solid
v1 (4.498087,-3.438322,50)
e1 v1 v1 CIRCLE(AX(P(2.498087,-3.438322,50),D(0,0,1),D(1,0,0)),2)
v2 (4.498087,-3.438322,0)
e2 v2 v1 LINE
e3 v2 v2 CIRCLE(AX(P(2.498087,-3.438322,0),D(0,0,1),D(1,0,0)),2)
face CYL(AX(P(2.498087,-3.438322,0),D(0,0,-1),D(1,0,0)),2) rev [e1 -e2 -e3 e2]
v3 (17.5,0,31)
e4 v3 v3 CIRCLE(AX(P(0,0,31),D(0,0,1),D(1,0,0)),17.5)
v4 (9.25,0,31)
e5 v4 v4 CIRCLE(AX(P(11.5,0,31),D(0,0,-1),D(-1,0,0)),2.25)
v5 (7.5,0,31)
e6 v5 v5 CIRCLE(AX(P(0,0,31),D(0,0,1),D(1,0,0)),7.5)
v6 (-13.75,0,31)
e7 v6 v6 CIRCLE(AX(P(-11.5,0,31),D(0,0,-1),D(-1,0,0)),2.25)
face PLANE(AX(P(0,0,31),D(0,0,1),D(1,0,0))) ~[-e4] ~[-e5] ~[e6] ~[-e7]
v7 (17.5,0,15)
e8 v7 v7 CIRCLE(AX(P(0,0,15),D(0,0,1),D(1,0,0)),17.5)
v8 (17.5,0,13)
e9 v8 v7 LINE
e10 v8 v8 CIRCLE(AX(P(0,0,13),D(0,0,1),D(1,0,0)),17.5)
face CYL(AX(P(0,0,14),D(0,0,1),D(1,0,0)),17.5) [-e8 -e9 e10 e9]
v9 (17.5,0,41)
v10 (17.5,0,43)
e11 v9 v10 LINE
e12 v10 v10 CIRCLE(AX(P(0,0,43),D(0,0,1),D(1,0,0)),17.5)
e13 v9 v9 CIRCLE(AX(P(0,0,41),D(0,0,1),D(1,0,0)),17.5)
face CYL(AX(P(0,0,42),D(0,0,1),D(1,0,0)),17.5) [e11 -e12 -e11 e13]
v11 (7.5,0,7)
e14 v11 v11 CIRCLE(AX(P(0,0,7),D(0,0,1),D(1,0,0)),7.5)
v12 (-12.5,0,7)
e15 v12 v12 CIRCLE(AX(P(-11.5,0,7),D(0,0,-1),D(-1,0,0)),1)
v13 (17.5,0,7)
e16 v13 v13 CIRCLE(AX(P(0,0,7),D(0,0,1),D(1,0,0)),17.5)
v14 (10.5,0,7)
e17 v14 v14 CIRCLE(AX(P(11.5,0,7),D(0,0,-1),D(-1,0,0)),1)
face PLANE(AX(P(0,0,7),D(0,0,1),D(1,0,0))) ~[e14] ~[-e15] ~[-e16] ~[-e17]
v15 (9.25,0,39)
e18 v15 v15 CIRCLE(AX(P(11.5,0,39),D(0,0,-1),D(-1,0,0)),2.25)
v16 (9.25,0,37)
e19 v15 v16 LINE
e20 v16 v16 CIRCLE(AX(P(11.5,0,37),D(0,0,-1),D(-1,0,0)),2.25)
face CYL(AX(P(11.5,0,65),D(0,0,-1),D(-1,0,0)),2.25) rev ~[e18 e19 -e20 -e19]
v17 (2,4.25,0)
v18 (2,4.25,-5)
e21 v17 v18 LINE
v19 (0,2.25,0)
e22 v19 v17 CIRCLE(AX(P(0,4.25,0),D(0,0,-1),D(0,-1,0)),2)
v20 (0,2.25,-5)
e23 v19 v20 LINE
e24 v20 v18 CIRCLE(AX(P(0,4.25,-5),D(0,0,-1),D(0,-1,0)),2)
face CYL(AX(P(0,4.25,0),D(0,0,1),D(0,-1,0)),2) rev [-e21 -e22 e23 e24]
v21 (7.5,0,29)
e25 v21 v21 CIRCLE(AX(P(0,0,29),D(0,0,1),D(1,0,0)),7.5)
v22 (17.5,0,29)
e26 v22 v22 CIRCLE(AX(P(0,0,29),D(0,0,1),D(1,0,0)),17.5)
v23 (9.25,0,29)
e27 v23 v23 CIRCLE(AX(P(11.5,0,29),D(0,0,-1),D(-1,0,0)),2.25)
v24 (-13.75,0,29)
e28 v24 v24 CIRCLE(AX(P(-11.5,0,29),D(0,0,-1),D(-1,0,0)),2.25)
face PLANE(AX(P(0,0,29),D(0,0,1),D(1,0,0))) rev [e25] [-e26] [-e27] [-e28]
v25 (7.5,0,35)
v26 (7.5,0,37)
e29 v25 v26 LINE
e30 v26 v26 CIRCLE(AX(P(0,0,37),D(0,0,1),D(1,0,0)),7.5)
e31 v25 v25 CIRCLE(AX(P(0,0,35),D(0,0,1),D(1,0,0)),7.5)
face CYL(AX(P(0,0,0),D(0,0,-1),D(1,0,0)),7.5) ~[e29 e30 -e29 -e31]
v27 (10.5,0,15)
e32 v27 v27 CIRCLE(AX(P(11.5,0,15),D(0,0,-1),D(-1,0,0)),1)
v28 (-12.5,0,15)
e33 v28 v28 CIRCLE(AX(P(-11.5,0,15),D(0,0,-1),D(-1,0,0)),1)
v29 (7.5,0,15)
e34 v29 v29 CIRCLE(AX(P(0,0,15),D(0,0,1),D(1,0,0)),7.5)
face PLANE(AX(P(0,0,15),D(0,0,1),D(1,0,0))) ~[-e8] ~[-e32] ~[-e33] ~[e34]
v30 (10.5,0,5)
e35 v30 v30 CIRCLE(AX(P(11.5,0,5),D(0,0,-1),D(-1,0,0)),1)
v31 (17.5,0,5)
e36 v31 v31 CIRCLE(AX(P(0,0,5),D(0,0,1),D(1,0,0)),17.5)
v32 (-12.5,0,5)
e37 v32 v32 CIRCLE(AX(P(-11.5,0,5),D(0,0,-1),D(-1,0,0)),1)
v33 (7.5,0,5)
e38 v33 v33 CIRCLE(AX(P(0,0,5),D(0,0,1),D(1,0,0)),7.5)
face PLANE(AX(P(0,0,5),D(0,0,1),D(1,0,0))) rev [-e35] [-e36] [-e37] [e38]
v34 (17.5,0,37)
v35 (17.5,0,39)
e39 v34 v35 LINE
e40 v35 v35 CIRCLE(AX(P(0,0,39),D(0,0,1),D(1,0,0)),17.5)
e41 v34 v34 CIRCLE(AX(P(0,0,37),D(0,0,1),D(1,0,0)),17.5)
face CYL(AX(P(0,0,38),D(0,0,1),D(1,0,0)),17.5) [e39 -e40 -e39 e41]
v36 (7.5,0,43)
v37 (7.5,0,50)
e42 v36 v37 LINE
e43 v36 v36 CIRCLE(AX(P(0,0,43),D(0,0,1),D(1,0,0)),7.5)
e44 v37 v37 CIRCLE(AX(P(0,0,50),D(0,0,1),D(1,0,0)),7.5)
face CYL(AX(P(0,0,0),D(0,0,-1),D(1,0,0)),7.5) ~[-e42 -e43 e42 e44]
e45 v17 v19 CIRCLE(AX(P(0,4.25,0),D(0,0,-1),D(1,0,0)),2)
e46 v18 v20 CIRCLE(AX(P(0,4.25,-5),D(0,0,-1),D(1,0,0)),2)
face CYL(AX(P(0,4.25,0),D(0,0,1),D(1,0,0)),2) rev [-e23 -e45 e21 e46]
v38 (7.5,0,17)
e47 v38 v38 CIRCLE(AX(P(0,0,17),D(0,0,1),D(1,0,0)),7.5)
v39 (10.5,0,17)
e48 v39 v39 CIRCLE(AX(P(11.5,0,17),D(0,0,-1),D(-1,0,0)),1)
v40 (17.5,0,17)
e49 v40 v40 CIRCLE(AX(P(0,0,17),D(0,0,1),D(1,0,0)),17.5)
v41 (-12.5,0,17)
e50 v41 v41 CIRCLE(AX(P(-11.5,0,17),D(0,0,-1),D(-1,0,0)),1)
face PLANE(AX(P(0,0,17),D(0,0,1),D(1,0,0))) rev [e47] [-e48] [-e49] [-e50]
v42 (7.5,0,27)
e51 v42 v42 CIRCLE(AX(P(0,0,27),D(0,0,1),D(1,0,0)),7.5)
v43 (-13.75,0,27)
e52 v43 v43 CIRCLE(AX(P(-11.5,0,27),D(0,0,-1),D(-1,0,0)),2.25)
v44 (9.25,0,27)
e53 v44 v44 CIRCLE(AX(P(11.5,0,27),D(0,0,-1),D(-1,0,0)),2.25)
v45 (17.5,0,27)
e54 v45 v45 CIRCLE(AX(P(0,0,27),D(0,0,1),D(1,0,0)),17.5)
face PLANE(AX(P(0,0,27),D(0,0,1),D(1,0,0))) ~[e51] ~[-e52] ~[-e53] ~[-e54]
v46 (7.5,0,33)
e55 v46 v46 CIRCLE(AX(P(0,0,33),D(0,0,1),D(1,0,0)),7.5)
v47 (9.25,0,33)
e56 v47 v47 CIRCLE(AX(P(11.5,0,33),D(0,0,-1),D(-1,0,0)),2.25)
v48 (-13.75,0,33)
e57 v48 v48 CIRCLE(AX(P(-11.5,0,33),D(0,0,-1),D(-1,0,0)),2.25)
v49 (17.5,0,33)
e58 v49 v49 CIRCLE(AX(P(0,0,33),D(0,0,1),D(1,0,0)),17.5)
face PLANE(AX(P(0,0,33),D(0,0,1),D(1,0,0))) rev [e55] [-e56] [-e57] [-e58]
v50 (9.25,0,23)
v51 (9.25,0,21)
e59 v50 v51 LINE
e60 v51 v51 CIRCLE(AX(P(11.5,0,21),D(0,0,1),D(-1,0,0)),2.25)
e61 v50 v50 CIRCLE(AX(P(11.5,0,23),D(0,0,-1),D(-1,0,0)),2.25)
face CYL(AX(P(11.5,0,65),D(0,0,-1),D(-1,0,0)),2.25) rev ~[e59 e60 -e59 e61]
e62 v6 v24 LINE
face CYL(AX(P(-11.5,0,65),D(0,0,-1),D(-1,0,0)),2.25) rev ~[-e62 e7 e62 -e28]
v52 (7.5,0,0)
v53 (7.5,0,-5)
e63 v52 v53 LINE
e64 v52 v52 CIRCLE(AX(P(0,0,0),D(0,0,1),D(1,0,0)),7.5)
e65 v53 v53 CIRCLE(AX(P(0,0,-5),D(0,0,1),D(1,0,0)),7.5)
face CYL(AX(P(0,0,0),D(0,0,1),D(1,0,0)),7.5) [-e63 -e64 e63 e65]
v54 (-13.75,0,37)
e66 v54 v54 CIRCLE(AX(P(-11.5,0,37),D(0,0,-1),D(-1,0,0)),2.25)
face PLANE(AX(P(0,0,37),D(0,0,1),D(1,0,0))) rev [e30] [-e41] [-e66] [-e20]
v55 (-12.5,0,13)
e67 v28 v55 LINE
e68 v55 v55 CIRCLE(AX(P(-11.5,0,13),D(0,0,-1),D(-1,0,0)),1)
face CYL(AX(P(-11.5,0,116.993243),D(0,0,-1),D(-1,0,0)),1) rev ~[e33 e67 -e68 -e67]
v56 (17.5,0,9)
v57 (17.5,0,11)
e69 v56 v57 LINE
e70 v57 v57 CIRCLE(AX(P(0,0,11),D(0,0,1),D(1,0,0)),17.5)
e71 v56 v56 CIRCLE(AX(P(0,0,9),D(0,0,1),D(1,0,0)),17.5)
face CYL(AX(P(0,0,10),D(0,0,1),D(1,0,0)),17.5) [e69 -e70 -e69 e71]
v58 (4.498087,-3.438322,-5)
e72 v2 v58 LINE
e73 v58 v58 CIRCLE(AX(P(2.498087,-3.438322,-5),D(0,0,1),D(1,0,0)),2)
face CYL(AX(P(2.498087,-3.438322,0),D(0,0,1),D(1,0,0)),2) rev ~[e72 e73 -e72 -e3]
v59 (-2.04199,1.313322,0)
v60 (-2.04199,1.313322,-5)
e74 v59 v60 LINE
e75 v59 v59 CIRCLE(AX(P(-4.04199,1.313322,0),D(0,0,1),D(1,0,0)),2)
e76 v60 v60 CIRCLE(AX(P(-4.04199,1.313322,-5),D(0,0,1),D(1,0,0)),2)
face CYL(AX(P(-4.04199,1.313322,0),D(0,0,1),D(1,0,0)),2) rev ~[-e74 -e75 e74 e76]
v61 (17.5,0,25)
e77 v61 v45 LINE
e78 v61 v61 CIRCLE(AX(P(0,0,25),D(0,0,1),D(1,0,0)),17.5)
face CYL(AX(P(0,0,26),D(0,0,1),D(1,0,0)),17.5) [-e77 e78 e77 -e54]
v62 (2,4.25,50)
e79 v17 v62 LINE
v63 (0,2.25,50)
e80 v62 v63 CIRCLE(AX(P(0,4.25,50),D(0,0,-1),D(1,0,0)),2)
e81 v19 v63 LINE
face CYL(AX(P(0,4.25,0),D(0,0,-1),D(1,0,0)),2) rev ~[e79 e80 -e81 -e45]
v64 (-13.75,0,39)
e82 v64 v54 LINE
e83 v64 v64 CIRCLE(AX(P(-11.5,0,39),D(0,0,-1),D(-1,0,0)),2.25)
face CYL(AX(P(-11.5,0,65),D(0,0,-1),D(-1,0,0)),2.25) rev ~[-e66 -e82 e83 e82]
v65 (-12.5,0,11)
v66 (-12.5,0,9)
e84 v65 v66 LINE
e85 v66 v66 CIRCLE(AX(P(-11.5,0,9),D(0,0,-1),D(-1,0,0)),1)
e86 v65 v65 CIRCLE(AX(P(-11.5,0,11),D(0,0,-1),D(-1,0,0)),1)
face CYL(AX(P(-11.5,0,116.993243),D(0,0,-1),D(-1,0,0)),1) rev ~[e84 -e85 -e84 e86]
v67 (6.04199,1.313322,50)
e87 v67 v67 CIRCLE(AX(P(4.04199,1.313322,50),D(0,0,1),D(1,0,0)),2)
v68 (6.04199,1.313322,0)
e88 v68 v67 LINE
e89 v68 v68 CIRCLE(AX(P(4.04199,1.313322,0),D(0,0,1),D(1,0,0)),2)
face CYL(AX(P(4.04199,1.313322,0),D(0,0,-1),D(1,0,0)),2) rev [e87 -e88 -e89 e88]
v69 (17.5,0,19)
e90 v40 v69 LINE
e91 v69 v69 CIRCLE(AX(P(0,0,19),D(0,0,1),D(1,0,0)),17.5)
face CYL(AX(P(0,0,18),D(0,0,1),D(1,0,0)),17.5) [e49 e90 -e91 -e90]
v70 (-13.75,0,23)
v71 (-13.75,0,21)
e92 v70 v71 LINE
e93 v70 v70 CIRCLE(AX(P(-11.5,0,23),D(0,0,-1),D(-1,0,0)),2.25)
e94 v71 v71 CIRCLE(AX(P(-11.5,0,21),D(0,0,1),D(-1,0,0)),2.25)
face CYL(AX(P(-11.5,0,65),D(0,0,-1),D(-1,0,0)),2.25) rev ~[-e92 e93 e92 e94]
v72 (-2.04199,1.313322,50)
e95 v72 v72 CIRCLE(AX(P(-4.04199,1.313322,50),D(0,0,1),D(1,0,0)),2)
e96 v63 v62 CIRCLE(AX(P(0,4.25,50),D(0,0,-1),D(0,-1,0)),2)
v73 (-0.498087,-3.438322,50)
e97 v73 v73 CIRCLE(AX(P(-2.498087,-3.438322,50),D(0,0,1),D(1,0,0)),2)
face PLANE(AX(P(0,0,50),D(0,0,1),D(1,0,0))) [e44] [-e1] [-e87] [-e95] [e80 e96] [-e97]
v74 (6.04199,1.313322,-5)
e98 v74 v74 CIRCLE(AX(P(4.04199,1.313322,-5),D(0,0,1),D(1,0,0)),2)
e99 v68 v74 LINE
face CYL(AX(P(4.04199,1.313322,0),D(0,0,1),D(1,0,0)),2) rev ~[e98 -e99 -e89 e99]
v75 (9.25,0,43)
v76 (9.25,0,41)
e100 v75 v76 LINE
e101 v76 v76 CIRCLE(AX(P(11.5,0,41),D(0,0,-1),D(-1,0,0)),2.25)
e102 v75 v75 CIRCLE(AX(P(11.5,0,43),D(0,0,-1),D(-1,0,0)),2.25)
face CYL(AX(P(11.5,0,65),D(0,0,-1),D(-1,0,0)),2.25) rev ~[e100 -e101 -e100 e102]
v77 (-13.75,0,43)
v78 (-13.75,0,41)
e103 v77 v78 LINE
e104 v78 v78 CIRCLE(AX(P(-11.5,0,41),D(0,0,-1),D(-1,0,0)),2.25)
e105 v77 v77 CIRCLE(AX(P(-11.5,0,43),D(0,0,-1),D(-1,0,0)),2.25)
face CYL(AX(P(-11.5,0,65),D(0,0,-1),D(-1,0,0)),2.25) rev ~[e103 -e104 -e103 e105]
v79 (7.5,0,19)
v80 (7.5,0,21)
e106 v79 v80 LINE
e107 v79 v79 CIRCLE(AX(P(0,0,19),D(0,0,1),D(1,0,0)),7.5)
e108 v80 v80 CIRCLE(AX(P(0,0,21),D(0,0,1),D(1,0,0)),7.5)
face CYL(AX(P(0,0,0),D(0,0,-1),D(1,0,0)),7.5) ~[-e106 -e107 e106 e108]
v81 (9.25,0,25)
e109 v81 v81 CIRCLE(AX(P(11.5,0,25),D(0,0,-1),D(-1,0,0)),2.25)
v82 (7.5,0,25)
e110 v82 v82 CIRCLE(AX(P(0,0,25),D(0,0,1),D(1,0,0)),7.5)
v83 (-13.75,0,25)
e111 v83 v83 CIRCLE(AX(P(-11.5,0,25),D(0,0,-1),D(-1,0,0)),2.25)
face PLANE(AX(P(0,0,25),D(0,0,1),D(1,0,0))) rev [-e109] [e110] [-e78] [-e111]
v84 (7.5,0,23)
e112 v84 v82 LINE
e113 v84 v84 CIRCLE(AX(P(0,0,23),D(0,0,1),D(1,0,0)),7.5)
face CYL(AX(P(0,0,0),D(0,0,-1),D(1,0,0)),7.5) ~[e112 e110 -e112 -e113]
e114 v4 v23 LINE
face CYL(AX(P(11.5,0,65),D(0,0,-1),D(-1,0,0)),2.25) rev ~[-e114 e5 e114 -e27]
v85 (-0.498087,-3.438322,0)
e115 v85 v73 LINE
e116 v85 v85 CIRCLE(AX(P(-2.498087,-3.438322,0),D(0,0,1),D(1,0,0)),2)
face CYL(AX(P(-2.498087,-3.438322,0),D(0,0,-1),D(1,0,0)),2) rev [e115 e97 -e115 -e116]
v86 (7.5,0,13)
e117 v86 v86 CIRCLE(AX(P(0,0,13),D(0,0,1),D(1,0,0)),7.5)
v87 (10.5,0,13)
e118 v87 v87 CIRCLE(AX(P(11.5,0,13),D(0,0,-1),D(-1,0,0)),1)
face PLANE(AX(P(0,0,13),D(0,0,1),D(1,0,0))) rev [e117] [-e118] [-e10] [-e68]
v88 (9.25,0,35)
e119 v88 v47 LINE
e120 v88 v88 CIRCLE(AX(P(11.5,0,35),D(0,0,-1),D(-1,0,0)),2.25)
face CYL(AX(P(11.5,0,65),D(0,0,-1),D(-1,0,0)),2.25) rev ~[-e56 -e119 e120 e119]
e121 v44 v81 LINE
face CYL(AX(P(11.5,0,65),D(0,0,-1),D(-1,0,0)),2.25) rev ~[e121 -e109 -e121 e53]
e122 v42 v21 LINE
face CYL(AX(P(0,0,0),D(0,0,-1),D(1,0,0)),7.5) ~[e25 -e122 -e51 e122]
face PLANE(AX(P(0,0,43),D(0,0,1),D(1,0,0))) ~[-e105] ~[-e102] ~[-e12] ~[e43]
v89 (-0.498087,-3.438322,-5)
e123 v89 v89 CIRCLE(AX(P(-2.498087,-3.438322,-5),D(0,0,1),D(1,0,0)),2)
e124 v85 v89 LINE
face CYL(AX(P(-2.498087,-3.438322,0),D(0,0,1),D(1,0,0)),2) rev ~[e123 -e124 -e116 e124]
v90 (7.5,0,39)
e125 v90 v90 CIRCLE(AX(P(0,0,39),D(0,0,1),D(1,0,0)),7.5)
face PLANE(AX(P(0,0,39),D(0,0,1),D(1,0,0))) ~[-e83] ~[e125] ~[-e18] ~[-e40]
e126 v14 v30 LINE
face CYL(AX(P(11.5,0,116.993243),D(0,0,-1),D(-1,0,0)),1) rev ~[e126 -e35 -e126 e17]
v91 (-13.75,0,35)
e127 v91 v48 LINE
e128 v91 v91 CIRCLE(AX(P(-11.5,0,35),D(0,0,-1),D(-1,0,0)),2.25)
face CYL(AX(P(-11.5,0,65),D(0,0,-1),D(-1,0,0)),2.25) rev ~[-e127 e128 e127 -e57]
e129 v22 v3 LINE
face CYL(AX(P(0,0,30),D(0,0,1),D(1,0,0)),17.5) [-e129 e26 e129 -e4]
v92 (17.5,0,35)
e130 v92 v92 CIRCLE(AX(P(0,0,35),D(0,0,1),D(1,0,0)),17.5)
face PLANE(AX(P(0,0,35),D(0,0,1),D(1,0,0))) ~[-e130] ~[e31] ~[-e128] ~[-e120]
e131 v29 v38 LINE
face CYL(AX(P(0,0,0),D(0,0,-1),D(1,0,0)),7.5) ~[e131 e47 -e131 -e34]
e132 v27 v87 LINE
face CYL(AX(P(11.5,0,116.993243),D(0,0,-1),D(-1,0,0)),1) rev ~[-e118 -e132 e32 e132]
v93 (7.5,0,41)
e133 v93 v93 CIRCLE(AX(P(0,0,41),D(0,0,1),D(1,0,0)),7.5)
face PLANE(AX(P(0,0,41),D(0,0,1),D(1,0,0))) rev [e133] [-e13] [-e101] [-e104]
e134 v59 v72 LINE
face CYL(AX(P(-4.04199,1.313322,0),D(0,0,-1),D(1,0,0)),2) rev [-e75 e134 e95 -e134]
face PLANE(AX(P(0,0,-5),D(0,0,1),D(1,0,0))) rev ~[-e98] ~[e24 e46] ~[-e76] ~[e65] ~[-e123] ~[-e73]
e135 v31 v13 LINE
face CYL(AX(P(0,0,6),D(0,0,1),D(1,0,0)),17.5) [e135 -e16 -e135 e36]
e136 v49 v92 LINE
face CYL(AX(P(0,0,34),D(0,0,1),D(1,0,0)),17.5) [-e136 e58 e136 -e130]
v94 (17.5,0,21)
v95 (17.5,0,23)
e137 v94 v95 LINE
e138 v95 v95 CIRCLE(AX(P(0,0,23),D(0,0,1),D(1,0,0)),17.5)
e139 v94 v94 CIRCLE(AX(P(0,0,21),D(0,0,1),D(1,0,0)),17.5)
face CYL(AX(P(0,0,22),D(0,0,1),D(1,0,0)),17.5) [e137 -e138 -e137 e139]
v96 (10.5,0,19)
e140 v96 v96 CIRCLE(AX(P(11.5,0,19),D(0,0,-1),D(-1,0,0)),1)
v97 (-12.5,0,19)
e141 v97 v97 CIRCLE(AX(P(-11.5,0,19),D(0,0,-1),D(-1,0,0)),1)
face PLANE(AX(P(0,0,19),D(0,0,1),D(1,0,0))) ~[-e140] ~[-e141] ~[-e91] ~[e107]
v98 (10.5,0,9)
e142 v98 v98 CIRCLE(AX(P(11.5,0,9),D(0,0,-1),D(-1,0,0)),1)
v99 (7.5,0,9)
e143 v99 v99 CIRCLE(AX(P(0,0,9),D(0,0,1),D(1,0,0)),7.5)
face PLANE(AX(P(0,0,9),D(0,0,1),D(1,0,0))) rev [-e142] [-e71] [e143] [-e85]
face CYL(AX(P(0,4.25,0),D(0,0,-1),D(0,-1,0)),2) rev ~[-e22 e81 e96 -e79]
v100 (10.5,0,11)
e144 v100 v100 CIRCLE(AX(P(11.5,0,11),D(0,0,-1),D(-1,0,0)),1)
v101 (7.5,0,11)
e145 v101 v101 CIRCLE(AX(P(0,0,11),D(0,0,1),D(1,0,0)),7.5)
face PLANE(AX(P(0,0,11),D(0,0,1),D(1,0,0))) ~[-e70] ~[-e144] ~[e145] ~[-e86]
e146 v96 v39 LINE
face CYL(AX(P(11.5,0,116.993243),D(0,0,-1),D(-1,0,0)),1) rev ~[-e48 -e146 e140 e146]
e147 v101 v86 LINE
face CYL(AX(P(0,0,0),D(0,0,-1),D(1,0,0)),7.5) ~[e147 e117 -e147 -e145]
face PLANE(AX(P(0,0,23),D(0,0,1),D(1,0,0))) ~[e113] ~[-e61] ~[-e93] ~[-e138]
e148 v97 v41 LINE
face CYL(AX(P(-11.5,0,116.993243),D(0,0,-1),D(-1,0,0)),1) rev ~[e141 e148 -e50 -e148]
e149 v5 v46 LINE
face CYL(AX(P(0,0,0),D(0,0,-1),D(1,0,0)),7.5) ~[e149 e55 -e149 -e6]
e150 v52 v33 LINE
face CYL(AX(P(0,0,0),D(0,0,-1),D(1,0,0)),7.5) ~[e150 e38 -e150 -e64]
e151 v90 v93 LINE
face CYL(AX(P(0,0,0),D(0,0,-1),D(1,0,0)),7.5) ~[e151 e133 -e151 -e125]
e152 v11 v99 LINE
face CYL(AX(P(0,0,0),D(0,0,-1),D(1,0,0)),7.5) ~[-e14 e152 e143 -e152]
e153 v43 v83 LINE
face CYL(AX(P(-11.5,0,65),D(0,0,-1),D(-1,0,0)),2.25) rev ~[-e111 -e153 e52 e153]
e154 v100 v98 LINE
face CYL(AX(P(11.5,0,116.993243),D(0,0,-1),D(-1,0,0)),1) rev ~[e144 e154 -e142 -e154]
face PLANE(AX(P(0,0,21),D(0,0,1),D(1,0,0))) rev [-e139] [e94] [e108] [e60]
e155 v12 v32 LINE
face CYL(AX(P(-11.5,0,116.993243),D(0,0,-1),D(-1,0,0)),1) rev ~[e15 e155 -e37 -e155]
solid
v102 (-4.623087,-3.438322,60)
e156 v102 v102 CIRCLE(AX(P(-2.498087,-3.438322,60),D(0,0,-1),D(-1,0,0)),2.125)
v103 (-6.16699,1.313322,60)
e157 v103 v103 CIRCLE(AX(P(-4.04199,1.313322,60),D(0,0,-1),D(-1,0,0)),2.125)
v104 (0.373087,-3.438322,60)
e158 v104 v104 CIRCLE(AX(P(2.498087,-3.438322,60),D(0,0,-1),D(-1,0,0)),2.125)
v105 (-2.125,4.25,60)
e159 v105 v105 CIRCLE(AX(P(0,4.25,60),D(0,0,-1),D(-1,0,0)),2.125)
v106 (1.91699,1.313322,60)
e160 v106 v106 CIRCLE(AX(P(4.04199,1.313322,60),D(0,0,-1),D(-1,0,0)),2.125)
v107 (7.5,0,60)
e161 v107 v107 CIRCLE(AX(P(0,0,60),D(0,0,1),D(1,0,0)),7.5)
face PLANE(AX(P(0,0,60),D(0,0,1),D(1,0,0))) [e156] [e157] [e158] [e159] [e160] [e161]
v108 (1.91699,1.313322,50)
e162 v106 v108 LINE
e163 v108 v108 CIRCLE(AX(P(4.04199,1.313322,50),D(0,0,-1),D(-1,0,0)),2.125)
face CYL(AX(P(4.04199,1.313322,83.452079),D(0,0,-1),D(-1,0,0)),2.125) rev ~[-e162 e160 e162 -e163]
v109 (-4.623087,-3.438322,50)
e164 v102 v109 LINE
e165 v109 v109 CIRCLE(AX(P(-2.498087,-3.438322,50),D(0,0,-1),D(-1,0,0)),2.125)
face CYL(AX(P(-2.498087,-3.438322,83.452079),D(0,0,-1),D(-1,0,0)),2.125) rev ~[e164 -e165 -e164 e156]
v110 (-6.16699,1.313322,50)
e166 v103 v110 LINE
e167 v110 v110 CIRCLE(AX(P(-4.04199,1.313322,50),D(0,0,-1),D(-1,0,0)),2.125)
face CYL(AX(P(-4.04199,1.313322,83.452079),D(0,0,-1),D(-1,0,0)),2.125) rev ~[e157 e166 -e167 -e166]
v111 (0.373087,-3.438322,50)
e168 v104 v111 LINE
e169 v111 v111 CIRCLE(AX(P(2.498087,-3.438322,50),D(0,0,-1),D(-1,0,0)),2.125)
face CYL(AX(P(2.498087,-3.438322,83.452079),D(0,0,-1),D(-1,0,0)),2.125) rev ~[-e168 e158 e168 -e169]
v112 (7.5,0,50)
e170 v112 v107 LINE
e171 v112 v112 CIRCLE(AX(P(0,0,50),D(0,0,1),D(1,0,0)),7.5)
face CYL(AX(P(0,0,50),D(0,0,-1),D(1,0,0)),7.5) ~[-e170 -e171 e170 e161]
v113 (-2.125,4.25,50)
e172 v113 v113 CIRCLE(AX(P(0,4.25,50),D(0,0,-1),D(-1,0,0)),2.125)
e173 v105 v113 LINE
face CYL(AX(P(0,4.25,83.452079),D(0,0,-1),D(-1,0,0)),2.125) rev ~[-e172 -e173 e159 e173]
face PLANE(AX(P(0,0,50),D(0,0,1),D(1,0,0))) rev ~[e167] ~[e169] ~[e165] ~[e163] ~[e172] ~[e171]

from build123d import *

# Parameters (mm, degrees)
F0_R     = 7.5
F0_R_2   = 2
F1_DEPTH = 50
F2_W     = 10
F2_H     = 2
F4_DEPTH = 5
F6_D     = 2
F7_D     = 4.5
F7_DEPTH = 22
F7_TIP   = 1.3519363928
F8_DEPTH = 10
F10_D    = 4.25


# Not quite as in the source:
# - a feature names something its author has since deleted; it is built from what else it names


with BuildPart() as f1:
    # F0 (on Top) → F1 (new body)
    with BuildSketch(Plane.XY):
        Circle(F0_R)
        with Locations((-2.4980873222, -3.4383222261)):
            Circle(F0_R_2, mode=Mode.SUBTRACT)
        with Locations((2.4980873222, -3.4383222261)):
            Circle(F0_R_2, mode=Mode.SUBTRACT)
        with Locations((-4.0419901943, 1.3133222261)):
            Circle(F0_R_2, mode=Mode.SUBTRACT)
        with Locations((4.0419901943, 1.3133222261)):
            Circle(F0_R_2, mode=Mode.SUBTRACT)
        with BuildLine():
            ThreePointArc((0, 2.25), (-1.4142135624, 5.6642135624), (2, 4.25))
            ThreePointArc((2, 4.25), (1.4142135624, 2.8357864376), (0, 2.25))
        make_face(mode=Mode.SUBTRACT)
    extrude(amount=F1_DEPTH)

    # F2 (on Front) → F3 (revolve)
    with BuildSketch(Plane.XZ):
        with Locations((12.5, 6)):
            Rectangle(F2_W, F2_H)
        with Locations((12.5, 10)):
            Rectangle(F2_W, F2_H)
        with Locations((12.5, 14)):
            Rectangle(F2_W, F2_H)
        with Locations((12.5, 18)):
            Rectangle(F2_W, F2_H)
        with Locations((12.5, 22)):
            Rectangle(F2_W, F2_H)
        with Locations((12.5, 26)):
            Rectangle(F2_W, F2_H)
        with Locations((12.5, 30)):
            Rectangle(F2_W, F2_H)
        with Locations((12.5, 34)):
            Rectangle(F2_W, F2_H)
        with Locations((12.5, 38)):
            Rectangle(F2_W, F2_H)
        with Locations((12.5, 42)):
            Rectangle(F2_W, F2_H)
    revolve(axis=Axis((0, 0, 30.4011311382), (0, 0, 1)))

    # F4 (add): a face of the model
    f4_faces = [f1.faces().sort_by_distance(p)[0] for p in [
        (0, 0, 0),
    ]]
    extrude(f4_faces, amount=F4_DEPTH)

    # F6 (through all)
    with Locations(Plane.XY.offset(43)):
        with Locations((-11.5, 0), (11.5, 0)):
            Hole(F6_D / 2)

    # F7
    with Locations(Plane.XY.offset(43)):
        with Locations((-11.5, 0), (11.5, 0)):
            Hole(F7_D / 2, depth=F7_DEPTH)
            with Locations((0, 0, -(F7_DEPTH + F7_TIP / 2))):  # 118° drill point
                Cone(0, F7_D / 2, F7_TIP, mode=Mode.SUBTRACT)


with BuildPart() as f8:
    # F8 (new): a face of the model
    f8_faces = [f1.part.faces().sort_by_distance(p)[0] for p in [
        (0, 0, 50),
    ]]
    extrude(f8_faces, amount=F8_DEPTH)

    # F10 (through all)
    with Locations(Plane.XY.offset(60)):
        with Locations((0, 4.25), (4.0419901943, 1.3133222261), (2.4980873222, -3.4383222261), (-2.4980873222, -3.4383222261), (-4.0419901943, 1.3133222261)):
            Hole(F10_D / 2)


solid = Compound([f1.part, f8.part])
